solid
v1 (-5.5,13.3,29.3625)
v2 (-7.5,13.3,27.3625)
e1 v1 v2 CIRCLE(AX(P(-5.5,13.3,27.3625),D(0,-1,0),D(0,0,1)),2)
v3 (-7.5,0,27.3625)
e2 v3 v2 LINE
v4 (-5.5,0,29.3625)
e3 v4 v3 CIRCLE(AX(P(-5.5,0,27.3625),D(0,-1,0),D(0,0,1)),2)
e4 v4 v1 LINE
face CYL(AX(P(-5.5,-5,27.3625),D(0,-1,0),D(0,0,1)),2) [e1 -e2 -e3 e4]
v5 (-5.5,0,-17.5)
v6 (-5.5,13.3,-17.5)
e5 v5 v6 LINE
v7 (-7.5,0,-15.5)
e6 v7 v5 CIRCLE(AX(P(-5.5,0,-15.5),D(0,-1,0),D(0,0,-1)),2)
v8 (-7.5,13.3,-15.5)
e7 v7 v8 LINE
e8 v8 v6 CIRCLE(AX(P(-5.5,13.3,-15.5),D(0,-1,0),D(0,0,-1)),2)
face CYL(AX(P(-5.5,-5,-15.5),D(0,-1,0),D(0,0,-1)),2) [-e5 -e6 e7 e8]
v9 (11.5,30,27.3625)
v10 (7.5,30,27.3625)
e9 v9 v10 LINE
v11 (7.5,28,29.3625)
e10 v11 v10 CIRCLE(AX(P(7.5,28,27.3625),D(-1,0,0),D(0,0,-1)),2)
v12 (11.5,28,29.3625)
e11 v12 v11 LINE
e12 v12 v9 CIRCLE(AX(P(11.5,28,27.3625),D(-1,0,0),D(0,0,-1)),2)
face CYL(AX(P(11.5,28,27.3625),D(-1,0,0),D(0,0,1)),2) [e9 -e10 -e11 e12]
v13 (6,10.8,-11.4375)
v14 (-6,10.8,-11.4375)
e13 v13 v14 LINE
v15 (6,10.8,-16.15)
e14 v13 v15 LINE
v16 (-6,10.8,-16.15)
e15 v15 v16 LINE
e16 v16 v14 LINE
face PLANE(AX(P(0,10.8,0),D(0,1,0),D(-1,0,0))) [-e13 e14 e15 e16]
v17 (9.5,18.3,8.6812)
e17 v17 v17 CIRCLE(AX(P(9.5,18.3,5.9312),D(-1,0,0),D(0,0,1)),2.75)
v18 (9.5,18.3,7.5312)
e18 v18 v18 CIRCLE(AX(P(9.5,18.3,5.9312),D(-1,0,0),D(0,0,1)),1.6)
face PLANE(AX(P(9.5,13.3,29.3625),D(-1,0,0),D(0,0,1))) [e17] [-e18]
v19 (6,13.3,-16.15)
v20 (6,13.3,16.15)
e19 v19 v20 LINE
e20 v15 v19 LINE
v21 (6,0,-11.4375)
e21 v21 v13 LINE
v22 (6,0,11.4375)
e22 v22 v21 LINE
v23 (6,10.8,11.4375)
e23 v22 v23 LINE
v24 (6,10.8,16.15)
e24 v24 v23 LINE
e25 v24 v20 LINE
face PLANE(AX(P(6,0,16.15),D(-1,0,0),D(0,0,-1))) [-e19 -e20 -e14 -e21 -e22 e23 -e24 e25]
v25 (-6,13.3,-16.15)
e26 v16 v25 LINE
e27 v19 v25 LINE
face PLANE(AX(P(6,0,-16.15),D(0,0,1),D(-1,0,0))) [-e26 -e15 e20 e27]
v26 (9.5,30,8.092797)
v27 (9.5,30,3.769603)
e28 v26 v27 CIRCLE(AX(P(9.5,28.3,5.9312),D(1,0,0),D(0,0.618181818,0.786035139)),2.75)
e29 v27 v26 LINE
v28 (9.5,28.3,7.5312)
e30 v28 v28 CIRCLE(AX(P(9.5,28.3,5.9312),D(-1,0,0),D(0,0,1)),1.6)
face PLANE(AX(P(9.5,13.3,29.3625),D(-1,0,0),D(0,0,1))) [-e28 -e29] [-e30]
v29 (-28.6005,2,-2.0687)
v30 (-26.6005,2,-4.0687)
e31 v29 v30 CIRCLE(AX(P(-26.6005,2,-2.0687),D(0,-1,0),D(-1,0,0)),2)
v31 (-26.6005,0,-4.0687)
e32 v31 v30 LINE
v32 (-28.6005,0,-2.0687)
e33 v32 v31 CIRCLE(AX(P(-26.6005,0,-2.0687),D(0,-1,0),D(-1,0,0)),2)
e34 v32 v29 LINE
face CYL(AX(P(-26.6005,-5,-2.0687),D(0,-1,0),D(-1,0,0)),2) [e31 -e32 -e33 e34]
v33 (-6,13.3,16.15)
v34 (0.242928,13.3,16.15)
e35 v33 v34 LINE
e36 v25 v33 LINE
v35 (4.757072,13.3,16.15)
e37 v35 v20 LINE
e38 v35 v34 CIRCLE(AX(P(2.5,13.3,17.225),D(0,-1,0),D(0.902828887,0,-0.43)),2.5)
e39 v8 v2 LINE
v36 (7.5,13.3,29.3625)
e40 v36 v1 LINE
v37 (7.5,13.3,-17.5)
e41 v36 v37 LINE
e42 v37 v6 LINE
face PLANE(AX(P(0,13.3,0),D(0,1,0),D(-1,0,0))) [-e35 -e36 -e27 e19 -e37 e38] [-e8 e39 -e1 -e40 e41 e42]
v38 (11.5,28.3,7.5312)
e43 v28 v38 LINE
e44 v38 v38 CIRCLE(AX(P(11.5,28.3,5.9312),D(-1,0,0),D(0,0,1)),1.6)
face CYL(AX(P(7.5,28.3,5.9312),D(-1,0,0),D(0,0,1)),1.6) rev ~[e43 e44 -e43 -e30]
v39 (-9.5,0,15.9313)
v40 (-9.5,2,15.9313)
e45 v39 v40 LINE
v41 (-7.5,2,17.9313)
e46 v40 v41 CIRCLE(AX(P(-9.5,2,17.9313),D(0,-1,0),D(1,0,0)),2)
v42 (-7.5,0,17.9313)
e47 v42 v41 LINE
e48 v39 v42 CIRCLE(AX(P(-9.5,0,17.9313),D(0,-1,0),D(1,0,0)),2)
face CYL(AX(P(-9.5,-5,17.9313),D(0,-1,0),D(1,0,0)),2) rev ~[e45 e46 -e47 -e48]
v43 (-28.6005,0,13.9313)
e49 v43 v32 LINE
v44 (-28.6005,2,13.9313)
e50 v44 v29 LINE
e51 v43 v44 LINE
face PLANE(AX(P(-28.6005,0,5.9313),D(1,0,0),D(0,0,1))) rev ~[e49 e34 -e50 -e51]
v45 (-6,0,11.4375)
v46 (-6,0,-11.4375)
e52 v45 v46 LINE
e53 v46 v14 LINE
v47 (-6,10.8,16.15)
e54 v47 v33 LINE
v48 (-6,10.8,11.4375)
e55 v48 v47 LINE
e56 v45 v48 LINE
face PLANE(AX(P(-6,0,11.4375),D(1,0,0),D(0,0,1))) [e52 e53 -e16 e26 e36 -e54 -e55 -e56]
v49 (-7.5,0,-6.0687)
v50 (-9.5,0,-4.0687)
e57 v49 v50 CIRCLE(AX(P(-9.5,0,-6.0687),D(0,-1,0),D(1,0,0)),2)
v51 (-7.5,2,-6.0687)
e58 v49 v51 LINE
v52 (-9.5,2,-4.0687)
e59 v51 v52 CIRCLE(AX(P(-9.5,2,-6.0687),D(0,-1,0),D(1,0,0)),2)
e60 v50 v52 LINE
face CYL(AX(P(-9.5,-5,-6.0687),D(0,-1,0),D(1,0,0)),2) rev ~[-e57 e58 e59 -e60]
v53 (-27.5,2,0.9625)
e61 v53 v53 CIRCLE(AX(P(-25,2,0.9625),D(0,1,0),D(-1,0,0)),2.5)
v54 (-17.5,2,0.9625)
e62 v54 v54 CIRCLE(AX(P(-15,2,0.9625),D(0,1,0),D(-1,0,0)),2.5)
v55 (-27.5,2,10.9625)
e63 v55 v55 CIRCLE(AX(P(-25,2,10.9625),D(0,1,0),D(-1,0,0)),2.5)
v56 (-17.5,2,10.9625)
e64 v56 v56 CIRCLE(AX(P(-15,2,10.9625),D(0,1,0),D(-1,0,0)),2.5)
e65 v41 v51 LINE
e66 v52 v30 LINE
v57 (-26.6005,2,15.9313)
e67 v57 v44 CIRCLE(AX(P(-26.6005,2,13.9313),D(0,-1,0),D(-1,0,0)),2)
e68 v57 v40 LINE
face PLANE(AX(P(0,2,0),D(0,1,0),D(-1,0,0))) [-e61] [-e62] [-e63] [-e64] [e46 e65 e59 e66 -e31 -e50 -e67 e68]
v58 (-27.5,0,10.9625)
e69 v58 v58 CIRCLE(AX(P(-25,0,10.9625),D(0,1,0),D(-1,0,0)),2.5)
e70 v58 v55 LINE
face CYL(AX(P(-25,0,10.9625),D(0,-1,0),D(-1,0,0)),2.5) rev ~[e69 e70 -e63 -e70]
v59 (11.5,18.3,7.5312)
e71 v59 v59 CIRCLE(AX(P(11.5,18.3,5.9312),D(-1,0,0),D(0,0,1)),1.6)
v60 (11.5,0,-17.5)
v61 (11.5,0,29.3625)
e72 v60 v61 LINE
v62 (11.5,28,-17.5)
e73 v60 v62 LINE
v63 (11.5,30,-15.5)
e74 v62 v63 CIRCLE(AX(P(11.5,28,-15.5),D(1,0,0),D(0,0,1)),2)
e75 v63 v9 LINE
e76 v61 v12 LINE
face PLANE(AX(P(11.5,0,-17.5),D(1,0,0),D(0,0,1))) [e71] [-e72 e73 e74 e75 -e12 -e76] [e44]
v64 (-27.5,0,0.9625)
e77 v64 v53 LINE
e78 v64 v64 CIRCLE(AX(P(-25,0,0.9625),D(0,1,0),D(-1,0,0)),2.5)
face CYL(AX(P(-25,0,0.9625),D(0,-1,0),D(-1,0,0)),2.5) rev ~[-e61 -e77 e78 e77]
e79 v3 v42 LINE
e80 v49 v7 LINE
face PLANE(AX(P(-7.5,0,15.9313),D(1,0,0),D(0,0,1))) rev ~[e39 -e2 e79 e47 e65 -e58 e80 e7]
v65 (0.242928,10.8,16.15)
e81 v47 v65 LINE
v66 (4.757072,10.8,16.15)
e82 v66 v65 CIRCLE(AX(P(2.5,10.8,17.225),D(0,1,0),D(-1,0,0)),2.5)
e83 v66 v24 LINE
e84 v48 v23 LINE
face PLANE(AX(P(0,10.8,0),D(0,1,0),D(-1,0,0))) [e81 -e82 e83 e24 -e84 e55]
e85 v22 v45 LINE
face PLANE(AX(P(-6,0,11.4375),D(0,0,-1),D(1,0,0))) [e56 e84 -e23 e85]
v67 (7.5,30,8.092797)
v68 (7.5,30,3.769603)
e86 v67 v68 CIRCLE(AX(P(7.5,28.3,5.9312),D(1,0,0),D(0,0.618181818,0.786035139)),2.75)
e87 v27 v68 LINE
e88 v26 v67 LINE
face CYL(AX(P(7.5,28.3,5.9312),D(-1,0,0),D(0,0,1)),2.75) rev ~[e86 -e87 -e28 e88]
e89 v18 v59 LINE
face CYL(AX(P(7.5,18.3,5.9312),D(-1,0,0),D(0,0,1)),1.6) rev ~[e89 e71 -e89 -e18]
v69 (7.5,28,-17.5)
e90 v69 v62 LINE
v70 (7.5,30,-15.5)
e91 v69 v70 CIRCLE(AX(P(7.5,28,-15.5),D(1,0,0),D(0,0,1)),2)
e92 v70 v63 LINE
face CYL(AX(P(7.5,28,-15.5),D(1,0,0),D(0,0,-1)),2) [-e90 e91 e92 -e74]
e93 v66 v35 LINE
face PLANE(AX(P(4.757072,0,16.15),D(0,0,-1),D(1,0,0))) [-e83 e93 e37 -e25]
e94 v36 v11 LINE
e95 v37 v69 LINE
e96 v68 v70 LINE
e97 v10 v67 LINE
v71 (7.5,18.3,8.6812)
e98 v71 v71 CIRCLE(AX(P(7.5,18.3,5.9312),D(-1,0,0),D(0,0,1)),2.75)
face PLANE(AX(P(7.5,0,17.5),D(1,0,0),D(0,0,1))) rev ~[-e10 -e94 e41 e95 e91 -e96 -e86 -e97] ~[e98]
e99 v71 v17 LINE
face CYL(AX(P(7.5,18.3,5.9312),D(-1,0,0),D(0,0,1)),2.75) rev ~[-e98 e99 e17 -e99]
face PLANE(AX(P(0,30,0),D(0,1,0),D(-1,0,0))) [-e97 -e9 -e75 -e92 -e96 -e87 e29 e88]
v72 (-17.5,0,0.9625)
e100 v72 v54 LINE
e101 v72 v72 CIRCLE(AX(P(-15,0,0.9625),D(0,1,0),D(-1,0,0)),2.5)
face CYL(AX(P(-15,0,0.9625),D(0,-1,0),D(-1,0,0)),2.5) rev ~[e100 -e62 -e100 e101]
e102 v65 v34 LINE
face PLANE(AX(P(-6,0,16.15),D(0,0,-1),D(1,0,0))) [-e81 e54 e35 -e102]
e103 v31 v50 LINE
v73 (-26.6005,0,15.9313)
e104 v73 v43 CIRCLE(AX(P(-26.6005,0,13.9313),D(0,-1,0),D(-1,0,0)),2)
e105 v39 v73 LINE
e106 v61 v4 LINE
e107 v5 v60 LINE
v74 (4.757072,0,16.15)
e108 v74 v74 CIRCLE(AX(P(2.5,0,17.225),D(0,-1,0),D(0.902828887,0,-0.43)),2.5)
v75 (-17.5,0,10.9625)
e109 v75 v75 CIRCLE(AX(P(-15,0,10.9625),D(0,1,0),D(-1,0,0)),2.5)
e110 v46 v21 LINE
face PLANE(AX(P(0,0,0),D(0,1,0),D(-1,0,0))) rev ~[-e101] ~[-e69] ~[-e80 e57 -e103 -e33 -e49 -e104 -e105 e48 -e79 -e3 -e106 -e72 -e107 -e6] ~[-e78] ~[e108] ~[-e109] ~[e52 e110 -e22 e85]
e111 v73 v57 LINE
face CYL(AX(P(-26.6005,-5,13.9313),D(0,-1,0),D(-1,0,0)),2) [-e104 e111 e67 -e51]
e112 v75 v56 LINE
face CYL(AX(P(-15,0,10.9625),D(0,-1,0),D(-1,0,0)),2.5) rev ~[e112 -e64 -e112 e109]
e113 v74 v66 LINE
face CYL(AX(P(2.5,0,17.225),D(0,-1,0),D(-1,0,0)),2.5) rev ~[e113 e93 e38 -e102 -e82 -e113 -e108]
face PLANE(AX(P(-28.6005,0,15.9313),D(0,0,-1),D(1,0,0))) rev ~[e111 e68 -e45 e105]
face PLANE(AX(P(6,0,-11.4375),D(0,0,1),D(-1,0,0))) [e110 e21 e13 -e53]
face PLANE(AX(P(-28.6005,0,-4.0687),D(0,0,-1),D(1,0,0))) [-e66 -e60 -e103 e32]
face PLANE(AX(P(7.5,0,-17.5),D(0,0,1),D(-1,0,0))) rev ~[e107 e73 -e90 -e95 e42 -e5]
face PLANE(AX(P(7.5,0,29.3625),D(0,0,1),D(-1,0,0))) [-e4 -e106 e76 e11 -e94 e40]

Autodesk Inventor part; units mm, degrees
ref_plane "YZ Plane" through (0, 0, 0) normal (1, 0, 0) x (0, 1, 0)
ref_plane "XZ Plane" through (0, 0, 0) normal (0, 1, 0) x (-1, 0, 0)
ref_plane "XY Plane" through (0, 0, 0) normal (0, 0, 1) x (1, 0, 0)
sketch "Sketch1" plane through (0, 0, 0) normal (0, 1, 0) x (-1, 0, 0)
  line L0 (6, 11.4375) -> (-6, 11.4375)
  line L1 (-6, 11.4375) -> (-6, -11.4375)
  line L2 (-6, -11.4375) -> (6, -11.4375)
  line L3 (6, -11.4375) -> (6, 11.4375)
  line L4 (6, 11.4375) -> (-6, -11.4375) construction
  line L5 (-6, 11.4375) -> (6, -11.4375) construction
  line L6 (6, 16.15) -> (-6, 16.15)
  line L7 (-6, 16.15) -> (-6, -16.15)
  line L8 (-6, -16.15) -> (6, -16.15)
  line L9 (6, -16.15) -> (6, 16.15)
  line L10 (6, 16.15) -> (-6, -16.15) construction
  line L11 (-6, 16.15) -> (6, -16.15) construction
  circle A0 centre (0, -5.4375) radius 2.5
  circle A1 centre (-2.5, 17.225) radius 2.5
  line L12 (7.5, 17.5) -> (-7.5, 17.5)
  line L13 (-7.5, 17.5) -> (-7.5, -17.5)
  line L14 (-7.5, -17.5) -> (7.5, -17.5)
  line L15 (7.5, -17.5) -> (7.5, 17.5)
  line L16 (7.5, 17.5) -> (-7.5, -17.5) construction
  line L17 (-7.5, 17.5) -> (7.5, -17.5) construction
  line L18 (7.5, 17.5) -> (-7.5, 17.5)
  line L19 (-7.5, 17.5) -> (-7.5, 29.3625)
  line L20 (-7.5, 29.3625) -> (7.5, 29.3625)
  line L21 (7.5, 29.3625) -> (7.5, 17.5)
  circle A2 centre (15, 0.9625) radius 2.5
  circle A3 centre (15, 10.9625) radius 2.5
  circle A4 centre (25, 10.9625) radius 2.5
  circle A5 centre (25, 0.9625) radius 2.5
  line L22 (28.6005, 5.9313) -> (28.6005, -4.0687)
  line L23 (28.6005, -4.0687) -> (7.5, -4.0687)
  line L24 (28.6005, 5.9313) -> (28.6005, 15.9313)
  line L25 (28.6005, 15.9313) -> (7.5, 15.9313)
  line L26 (-7.5, -17.5) -> (-11.5, -17.5)
  line L27 (-11.5, -17.5) -> (-11.5, 29.3625)
  line L28 (-11.5, 29.3625) -> (-7.5, 29.3625)
  line L29 (-7.5, 29.3625) -> (-7.5, -17.5)
  point P0 (0, 0)
  point P1 (0, -11.4375)
  point P2 (-0.2429, 16.15)
  point P3 (-4.7571, 16.15)
  point P4 (-4.9848, 17.5)
  point P5 (-0.0152, 17.5)
  dimension "d2" = 12
  dimension "d3" = 22.875
  dimension "d4" = 12
  dimension "d5" = 32.3
  dimension "d6" = 5
  dimension "d7" = 6
  dimension "d8" = 5
  dimension "d9" = 22.8
  dimension "d10" = 15
  dimension "d11" = 35
  dimension "d17" = 5
  dimension "d18" = 15
  dimension "d19" = 6.4
  dimension "d20" = 5
  dimension "d21" = 10
  dimension "d22" = 5
  dimension "d23" = 10
  dimension "d25" = 5
  dimension "d27" = 10
  dimension "d31" = 4
  dimension "d46" = 10
extrude "Extrusion1" add sketch "Sketch1" along normal blind 10.8 contours L0 L7 L6 A1 L9 | L9 L8 L7 L2
extrude "Extrusion2" add sketch "Sketch1" along normal blind 13.3 contours L9 L6 A1 L12 L15 L14 L13 L7 L1 L8 L3 | L12 L19 L20 L21 A1
extrude "Extrusion3" add sketch "Sketch1" along normal blind 2 contours L25 L24 L22 L23 L15
fillet "Fillet1" radius 2 6 edges at (-7.5, 1, -4.0687) (-7.5, 1, 15.9313) (-28.6005, 1, 15.9313) (-28.6005, 1, -4.0687) (-7.5, 6.65, 29.3625) (-7.5, 6.65, -17.5)
extrude "Extrusion4" add sketch "Sketch1" along normal blind 30 contours L13 L26 L27 L28 L19
sketch "Sketch2" plane through (7.5, 13.3, 29.3625) normal (-1, 0, 0) x (0, 0, 1)
  circle A0 centre (-23.4313, 5) radius 1.6
  circle A1 centre (-23.4313, 5) radius 2.75
  circle A2 centre (-23.4313, 15) radius 1.6
  circle A3 centre (-23.4313, 15) radius 2.75
  line L0 (0, 0) -> (-46.8625, 0) projected
  point P0 (-29.3625, -13.3)
  dimension "d34" = 3.2
  dimension "d35" = 5.5
  dimension "d36" = 3.2
  dimension "d37" = 5.5
  dimension "d39" = 5
  dimension "d40" = 10
extrude "Extrusion5" cut sketch "Sketch2" against normal blind 4 contours A0 | A2
extrude "Extrusion6" cut sketch "Sketch2" against normal blind 2
fillet "Fillet2" radius 2 2 edges at (9.5, 30, 29.3625) (9.5, 30, -17.5)
properties part number "Bracket Servo_3DPrint"
